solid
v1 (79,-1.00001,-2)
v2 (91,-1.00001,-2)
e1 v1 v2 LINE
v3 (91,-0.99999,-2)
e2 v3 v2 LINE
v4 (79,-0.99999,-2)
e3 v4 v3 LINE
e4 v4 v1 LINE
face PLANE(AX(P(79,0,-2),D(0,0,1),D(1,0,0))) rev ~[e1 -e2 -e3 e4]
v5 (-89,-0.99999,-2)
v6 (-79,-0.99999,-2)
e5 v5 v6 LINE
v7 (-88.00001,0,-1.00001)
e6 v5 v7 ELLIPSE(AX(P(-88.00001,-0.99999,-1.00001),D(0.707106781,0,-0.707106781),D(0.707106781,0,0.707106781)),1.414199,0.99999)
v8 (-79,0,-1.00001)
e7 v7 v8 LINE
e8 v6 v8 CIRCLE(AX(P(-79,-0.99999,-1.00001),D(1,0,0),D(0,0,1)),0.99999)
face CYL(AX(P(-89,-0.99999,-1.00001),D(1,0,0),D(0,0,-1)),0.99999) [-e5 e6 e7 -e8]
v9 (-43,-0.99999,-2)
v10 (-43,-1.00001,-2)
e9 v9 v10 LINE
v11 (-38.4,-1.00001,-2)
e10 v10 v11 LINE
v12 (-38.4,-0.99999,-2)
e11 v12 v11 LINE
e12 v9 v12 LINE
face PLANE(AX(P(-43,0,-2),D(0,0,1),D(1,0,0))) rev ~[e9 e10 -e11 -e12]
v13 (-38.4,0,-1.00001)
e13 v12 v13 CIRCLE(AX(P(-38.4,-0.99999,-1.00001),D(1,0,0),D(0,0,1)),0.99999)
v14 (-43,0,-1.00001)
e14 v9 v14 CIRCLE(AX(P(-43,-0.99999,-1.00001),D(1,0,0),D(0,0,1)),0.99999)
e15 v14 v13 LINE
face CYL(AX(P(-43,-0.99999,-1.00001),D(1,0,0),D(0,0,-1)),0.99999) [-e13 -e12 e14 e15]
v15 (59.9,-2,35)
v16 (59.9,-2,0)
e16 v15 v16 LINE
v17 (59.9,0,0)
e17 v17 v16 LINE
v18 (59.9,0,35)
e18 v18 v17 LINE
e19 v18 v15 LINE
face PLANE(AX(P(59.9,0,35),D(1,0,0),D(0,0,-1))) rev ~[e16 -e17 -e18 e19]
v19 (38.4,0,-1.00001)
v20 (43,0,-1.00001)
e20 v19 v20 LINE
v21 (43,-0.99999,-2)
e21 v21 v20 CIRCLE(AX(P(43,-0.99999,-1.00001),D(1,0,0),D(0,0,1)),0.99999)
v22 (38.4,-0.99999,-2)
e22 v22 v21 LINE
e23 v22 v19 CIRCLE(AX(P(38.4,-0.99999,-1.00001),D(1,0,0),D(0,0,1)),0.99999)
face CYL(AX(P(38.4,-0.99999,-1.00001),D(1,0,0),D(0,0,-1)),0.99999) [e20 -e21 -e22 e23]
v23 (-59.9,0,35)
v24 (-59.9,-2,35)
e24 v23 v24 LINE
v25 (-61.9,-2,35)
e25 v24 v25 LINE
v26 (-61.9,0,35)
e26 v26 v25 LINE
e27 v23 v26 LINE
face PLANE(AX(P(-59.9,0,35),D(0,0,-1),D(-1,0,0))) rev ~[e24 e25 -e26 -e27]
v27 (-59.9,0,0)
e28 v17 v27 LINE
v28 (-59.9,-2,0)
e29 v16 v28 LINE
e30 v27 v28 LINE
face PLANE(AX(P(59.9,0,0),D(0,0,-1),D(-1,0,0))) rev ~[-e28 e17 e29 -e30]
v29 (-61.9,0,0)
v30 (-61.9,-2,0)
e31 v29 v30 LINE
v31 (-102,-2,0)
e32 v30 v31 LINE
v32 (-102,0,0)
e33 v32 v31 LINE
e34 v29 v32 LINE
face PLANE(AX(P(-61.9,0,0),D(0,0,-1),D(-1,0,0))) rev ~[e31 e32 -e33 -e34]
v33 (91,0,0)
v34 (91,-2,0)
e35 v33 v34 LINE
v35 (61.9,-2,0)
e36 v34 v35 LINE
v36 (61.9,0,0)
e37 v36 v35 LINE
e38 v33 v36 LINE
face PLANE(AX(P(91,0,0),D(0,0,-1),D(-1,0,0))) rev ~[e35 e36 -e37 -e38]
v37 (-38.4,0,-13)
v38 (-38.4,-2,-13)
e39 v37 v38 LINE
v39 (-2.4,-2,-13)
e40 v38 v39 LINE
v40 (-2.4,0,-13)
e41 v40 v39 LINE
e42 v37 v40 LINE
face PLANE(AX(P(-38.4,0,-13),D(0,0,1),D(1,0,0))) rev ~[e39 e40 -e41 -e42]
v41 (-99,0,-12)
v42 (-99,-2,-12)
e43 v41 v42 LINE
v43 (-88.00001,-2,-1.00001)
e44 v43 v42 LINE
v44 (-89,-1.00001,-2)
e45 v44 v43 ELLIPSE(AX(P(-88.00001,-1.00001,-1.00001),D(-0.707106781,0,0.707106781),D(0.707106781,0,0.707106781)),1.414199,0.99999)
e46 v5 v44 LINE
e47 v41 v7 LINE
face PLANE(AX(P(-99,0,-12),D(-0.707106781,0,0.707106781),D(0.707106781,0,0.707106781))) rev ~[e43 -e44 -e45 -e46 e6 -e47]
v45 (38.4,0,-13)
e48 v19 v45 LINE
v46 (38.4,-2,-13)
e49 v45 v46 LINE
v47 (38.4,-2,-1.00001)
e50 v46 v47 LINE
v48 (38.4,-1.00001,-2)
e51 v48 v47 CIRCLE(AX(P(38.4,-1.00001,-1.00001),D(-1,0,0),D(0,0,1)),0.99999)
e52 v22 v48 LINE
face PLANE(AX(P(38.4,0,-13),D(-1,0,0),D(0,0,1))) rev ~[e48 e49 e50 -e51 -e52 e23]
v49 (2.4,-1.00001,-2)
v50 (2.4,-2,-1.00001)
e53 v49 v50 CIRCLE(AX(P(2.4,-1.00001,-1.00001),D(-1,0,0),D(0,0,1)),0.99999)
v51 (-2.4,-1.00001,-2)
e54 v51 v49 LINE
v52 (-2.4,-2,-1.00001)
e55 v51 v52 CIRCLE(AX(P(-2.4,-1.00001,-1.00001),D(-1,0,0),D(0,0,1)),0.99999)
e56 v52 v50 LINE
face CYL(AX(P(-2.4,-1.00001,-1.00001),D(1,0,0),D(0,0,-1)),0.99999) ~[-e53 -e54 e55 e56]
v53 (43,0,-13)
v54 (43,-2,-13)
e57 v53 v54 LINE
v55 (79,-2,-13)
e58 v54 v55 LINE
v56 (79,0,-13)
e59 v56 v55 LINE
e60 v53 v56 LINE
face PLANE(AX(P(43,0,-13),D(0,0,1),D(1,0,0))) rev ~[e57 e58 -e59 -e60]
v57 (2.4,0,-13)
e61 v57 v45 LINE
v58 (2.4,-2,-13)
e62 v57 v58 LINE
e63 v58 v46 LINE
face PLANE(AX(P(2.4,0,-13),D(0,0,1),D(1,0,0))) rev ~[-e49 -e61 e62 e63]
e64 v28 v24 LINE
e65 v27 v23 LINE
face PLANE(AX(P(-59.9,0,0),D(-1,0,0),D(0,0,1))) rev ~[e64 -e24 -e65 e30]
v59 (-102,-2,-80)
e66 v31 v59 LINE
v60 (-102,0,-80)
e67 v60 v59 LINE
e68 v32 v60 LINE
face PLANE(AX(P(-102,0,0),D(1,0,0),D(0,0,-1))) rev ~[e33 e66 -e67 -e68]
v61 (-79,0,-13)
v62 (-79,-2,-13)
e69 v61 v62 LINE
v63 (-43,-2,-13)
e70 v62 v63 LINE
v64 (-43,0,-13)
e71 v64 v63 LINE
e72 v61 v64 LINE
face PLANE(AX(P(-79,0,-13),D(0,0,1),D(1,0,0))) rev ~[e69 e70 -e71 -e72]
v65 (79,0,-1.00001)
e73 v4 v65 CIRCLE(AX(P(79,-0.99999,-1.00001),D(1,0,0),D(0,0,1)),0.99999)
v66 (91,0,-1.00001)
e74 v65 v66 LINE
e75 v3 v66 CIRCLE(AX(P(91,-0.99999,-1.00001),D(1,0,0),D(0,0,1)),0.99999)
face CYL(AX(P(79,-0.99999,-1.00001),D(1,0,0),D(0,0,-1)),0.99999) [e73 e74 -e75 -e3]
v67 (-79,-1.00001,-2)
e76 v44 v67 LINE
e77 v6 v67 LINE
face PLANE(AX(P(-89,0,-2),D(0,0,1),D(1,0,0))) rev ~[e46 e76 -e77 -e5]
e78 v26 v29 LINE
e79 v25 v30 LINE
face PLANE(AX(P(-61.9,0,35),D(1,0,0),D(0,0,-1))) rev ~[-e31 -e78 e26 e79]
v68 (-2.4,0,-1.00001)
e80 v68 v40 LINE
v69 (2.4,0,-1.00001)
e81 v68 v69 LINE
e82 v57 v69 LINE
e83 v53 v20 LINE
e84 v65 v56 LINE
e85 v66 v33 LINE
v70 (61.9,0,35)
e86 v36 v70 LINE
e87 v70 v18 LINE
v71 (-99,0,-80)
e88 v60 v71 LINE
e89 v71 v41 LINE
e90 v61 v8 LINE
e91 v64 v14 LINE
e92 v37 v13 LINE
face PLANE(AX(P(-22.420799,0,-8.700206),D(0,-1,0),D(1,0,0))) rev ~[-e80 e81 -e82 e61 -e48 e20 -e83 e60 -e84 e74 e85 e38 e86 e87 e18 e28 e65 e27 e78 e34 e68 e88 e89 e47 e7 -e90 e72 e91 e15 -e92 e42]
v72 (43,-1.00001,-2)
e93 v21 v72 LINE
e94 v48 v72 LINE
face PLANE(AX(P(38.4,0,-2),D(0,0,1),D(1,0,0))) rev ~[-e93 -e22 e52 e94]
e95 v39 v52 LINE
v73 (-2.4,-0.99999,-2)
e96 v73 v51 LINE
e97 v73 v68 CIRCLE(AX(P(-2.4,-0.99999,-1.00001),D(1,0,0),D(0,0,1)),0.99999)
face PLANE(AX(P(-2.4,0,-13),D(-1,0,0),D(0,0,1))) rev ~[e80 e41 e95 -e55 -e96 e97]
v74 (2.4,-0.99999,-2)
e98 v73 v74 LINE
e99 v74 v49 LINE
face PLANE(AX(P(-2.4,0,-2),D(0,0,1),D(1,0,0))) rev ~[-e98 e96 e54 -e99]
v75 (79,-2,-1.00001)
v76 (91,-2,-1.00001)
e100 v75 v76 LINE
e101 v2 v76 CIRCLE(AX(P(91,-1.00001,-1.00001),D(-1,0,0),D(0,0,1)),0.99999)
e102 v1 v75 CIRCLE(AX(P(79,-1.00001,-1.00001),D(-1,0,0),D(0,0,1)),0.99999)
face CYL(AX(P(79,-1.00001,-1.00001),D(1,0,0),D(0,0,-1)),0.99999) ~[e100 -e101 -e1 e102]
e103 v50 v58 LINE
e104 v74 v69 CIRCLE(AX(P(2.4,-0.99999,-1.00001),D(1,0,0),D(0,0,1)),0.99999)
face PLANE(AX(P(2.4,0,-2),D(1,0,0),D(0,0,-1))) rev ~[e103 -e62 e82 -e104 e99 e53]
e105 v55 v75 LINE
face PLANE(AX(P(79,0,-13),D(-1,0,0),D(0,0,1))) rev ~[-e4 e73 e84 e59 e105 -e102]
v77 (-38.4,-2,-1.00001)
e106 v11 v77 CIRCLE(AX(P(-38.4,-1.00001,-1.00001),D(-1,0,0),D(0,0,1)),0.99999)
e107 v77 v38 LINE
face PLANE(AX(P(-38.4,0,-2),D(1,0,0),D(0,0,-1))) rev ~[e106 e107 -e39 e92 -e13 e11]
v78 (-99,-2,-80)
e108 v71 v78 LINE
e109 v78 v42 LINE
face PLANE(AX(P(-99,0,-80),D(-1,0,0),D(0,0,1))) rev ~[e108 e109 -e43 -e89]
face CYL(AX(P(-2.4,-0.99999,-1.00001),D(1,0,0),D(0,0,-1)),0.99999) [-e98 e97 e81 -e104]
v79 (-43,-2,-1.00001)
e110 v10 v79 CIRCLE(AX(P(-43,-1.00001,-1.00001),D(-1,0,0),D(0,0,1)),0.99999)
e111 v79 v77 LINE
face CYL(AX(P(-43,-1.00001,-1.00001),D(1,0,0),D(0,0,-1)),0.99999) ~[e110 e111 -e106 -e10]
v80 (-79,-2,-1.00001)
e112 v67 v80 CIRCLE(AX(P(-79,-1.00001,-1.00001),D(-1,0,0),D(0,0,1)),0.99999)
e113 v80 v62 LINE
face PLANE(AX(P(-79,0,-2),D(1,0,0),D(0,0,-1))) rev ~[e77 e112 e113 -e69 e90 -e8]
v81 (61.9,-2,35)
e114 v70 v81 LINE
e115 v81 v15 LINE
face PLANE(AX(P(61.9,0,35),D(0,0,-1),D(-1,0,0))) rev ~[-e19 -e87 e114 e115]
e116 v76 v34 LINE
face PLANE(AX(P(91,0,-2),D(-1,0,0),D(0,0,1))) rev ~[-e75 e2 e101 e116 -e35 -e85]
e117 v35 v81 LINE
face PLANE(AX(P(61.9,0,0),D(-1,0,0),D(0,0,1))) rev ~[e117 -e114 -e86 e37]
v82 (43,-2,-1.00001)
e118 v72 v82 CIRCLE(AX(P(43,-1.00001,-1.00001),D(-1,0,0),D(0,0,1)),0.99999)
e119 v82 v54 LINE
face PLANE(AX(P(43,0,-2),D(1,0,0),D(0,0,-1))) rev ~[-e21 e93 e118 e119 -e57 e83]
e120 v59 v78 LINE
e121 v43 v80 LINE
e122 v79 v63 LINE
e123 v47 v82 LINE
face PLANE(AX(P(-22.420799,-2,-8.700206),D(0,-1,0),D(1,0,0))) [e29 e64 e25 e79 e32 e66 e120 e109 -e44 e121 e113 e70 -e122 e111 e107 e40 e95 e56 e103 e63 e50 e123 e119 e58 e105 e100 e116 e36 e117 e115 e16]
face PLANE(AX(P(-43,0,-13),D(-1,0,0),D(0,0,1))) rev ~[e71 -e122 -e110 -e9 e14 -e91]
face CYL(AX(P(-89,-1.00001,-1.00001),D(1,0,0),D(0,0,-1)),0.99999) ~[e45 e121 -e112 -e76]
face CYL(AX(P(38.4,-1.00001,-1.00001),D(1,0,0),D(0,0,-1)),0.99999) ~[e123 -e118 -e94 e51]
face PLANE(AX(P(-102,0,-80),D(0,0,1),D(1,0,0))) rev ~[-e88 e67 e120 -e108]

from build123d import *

# Parameters (mm, degrees)
F1_DEPTH = 2
F2_R     = 0.99999
F3_R     = 0.99999


# Not quite as in the source:
# - a fillet or chamfer is up to 0.001 mm smaller than in the source, because OpenCascade refuses the exact size


with BuildPart() as f1:
    # F0 (on Front) → F1 (new body)
    with BuildSketch(Plane.XZ):
        Polygon((59.9, 0), (0, 0), (-59.9, 0), (-59.9, 35), (-61.9, 35), (-61.9, 0), (-79, 0), (-100, 0), (-102, 0), (-102, -80), (-99, -80), (-99, -12), (-89, -2), (-79, -2), (-79, -13), (-43, -13), (-43, -2), (-38.4, -2), (-38.4, -13), (-2.4, -13), (-2.4, -2), (0, -2), (2.4, -2), (2.4, -13), (38.4, -13), (38.4, -2), (43, -2), (43, -13), (79, -13), (79, -2), (91, -2), (91, 0), (79, 0), (61.9, 0), (61.9, 35), (59.9, 35), align=None)
    extrude(amount=F1_DEPTH)

    # F2 (radius 1 in the source; OpenCascade refuses exactly that, so slightly less here)
    f2_edges = [f1.edges().sort_by_distance(p)[0] for p in [
        (-84, -2, -2),
        (-84, 0, -2),
        (85, 0, -2),
        (85, -2, -2),
    ]]
    fillet(f2_edges, radius=F2_R)

    # F3 (radius 1 in the source; OpenCascade refuses exactly that, so slightly less here)
    f3_edges = [f1.edges().sort_by_distance(p)[0] for p in [
        (-40.7, -2, -2),
        (0, -2, -2),
        (40.7, -2, -2),
        (-40.7, 0, -2),
        (0, 0, -2),
        (40.7, 0, -2),
    ]]
    fillet(f3_edges, radius=F3_R)


solid = f1.part
